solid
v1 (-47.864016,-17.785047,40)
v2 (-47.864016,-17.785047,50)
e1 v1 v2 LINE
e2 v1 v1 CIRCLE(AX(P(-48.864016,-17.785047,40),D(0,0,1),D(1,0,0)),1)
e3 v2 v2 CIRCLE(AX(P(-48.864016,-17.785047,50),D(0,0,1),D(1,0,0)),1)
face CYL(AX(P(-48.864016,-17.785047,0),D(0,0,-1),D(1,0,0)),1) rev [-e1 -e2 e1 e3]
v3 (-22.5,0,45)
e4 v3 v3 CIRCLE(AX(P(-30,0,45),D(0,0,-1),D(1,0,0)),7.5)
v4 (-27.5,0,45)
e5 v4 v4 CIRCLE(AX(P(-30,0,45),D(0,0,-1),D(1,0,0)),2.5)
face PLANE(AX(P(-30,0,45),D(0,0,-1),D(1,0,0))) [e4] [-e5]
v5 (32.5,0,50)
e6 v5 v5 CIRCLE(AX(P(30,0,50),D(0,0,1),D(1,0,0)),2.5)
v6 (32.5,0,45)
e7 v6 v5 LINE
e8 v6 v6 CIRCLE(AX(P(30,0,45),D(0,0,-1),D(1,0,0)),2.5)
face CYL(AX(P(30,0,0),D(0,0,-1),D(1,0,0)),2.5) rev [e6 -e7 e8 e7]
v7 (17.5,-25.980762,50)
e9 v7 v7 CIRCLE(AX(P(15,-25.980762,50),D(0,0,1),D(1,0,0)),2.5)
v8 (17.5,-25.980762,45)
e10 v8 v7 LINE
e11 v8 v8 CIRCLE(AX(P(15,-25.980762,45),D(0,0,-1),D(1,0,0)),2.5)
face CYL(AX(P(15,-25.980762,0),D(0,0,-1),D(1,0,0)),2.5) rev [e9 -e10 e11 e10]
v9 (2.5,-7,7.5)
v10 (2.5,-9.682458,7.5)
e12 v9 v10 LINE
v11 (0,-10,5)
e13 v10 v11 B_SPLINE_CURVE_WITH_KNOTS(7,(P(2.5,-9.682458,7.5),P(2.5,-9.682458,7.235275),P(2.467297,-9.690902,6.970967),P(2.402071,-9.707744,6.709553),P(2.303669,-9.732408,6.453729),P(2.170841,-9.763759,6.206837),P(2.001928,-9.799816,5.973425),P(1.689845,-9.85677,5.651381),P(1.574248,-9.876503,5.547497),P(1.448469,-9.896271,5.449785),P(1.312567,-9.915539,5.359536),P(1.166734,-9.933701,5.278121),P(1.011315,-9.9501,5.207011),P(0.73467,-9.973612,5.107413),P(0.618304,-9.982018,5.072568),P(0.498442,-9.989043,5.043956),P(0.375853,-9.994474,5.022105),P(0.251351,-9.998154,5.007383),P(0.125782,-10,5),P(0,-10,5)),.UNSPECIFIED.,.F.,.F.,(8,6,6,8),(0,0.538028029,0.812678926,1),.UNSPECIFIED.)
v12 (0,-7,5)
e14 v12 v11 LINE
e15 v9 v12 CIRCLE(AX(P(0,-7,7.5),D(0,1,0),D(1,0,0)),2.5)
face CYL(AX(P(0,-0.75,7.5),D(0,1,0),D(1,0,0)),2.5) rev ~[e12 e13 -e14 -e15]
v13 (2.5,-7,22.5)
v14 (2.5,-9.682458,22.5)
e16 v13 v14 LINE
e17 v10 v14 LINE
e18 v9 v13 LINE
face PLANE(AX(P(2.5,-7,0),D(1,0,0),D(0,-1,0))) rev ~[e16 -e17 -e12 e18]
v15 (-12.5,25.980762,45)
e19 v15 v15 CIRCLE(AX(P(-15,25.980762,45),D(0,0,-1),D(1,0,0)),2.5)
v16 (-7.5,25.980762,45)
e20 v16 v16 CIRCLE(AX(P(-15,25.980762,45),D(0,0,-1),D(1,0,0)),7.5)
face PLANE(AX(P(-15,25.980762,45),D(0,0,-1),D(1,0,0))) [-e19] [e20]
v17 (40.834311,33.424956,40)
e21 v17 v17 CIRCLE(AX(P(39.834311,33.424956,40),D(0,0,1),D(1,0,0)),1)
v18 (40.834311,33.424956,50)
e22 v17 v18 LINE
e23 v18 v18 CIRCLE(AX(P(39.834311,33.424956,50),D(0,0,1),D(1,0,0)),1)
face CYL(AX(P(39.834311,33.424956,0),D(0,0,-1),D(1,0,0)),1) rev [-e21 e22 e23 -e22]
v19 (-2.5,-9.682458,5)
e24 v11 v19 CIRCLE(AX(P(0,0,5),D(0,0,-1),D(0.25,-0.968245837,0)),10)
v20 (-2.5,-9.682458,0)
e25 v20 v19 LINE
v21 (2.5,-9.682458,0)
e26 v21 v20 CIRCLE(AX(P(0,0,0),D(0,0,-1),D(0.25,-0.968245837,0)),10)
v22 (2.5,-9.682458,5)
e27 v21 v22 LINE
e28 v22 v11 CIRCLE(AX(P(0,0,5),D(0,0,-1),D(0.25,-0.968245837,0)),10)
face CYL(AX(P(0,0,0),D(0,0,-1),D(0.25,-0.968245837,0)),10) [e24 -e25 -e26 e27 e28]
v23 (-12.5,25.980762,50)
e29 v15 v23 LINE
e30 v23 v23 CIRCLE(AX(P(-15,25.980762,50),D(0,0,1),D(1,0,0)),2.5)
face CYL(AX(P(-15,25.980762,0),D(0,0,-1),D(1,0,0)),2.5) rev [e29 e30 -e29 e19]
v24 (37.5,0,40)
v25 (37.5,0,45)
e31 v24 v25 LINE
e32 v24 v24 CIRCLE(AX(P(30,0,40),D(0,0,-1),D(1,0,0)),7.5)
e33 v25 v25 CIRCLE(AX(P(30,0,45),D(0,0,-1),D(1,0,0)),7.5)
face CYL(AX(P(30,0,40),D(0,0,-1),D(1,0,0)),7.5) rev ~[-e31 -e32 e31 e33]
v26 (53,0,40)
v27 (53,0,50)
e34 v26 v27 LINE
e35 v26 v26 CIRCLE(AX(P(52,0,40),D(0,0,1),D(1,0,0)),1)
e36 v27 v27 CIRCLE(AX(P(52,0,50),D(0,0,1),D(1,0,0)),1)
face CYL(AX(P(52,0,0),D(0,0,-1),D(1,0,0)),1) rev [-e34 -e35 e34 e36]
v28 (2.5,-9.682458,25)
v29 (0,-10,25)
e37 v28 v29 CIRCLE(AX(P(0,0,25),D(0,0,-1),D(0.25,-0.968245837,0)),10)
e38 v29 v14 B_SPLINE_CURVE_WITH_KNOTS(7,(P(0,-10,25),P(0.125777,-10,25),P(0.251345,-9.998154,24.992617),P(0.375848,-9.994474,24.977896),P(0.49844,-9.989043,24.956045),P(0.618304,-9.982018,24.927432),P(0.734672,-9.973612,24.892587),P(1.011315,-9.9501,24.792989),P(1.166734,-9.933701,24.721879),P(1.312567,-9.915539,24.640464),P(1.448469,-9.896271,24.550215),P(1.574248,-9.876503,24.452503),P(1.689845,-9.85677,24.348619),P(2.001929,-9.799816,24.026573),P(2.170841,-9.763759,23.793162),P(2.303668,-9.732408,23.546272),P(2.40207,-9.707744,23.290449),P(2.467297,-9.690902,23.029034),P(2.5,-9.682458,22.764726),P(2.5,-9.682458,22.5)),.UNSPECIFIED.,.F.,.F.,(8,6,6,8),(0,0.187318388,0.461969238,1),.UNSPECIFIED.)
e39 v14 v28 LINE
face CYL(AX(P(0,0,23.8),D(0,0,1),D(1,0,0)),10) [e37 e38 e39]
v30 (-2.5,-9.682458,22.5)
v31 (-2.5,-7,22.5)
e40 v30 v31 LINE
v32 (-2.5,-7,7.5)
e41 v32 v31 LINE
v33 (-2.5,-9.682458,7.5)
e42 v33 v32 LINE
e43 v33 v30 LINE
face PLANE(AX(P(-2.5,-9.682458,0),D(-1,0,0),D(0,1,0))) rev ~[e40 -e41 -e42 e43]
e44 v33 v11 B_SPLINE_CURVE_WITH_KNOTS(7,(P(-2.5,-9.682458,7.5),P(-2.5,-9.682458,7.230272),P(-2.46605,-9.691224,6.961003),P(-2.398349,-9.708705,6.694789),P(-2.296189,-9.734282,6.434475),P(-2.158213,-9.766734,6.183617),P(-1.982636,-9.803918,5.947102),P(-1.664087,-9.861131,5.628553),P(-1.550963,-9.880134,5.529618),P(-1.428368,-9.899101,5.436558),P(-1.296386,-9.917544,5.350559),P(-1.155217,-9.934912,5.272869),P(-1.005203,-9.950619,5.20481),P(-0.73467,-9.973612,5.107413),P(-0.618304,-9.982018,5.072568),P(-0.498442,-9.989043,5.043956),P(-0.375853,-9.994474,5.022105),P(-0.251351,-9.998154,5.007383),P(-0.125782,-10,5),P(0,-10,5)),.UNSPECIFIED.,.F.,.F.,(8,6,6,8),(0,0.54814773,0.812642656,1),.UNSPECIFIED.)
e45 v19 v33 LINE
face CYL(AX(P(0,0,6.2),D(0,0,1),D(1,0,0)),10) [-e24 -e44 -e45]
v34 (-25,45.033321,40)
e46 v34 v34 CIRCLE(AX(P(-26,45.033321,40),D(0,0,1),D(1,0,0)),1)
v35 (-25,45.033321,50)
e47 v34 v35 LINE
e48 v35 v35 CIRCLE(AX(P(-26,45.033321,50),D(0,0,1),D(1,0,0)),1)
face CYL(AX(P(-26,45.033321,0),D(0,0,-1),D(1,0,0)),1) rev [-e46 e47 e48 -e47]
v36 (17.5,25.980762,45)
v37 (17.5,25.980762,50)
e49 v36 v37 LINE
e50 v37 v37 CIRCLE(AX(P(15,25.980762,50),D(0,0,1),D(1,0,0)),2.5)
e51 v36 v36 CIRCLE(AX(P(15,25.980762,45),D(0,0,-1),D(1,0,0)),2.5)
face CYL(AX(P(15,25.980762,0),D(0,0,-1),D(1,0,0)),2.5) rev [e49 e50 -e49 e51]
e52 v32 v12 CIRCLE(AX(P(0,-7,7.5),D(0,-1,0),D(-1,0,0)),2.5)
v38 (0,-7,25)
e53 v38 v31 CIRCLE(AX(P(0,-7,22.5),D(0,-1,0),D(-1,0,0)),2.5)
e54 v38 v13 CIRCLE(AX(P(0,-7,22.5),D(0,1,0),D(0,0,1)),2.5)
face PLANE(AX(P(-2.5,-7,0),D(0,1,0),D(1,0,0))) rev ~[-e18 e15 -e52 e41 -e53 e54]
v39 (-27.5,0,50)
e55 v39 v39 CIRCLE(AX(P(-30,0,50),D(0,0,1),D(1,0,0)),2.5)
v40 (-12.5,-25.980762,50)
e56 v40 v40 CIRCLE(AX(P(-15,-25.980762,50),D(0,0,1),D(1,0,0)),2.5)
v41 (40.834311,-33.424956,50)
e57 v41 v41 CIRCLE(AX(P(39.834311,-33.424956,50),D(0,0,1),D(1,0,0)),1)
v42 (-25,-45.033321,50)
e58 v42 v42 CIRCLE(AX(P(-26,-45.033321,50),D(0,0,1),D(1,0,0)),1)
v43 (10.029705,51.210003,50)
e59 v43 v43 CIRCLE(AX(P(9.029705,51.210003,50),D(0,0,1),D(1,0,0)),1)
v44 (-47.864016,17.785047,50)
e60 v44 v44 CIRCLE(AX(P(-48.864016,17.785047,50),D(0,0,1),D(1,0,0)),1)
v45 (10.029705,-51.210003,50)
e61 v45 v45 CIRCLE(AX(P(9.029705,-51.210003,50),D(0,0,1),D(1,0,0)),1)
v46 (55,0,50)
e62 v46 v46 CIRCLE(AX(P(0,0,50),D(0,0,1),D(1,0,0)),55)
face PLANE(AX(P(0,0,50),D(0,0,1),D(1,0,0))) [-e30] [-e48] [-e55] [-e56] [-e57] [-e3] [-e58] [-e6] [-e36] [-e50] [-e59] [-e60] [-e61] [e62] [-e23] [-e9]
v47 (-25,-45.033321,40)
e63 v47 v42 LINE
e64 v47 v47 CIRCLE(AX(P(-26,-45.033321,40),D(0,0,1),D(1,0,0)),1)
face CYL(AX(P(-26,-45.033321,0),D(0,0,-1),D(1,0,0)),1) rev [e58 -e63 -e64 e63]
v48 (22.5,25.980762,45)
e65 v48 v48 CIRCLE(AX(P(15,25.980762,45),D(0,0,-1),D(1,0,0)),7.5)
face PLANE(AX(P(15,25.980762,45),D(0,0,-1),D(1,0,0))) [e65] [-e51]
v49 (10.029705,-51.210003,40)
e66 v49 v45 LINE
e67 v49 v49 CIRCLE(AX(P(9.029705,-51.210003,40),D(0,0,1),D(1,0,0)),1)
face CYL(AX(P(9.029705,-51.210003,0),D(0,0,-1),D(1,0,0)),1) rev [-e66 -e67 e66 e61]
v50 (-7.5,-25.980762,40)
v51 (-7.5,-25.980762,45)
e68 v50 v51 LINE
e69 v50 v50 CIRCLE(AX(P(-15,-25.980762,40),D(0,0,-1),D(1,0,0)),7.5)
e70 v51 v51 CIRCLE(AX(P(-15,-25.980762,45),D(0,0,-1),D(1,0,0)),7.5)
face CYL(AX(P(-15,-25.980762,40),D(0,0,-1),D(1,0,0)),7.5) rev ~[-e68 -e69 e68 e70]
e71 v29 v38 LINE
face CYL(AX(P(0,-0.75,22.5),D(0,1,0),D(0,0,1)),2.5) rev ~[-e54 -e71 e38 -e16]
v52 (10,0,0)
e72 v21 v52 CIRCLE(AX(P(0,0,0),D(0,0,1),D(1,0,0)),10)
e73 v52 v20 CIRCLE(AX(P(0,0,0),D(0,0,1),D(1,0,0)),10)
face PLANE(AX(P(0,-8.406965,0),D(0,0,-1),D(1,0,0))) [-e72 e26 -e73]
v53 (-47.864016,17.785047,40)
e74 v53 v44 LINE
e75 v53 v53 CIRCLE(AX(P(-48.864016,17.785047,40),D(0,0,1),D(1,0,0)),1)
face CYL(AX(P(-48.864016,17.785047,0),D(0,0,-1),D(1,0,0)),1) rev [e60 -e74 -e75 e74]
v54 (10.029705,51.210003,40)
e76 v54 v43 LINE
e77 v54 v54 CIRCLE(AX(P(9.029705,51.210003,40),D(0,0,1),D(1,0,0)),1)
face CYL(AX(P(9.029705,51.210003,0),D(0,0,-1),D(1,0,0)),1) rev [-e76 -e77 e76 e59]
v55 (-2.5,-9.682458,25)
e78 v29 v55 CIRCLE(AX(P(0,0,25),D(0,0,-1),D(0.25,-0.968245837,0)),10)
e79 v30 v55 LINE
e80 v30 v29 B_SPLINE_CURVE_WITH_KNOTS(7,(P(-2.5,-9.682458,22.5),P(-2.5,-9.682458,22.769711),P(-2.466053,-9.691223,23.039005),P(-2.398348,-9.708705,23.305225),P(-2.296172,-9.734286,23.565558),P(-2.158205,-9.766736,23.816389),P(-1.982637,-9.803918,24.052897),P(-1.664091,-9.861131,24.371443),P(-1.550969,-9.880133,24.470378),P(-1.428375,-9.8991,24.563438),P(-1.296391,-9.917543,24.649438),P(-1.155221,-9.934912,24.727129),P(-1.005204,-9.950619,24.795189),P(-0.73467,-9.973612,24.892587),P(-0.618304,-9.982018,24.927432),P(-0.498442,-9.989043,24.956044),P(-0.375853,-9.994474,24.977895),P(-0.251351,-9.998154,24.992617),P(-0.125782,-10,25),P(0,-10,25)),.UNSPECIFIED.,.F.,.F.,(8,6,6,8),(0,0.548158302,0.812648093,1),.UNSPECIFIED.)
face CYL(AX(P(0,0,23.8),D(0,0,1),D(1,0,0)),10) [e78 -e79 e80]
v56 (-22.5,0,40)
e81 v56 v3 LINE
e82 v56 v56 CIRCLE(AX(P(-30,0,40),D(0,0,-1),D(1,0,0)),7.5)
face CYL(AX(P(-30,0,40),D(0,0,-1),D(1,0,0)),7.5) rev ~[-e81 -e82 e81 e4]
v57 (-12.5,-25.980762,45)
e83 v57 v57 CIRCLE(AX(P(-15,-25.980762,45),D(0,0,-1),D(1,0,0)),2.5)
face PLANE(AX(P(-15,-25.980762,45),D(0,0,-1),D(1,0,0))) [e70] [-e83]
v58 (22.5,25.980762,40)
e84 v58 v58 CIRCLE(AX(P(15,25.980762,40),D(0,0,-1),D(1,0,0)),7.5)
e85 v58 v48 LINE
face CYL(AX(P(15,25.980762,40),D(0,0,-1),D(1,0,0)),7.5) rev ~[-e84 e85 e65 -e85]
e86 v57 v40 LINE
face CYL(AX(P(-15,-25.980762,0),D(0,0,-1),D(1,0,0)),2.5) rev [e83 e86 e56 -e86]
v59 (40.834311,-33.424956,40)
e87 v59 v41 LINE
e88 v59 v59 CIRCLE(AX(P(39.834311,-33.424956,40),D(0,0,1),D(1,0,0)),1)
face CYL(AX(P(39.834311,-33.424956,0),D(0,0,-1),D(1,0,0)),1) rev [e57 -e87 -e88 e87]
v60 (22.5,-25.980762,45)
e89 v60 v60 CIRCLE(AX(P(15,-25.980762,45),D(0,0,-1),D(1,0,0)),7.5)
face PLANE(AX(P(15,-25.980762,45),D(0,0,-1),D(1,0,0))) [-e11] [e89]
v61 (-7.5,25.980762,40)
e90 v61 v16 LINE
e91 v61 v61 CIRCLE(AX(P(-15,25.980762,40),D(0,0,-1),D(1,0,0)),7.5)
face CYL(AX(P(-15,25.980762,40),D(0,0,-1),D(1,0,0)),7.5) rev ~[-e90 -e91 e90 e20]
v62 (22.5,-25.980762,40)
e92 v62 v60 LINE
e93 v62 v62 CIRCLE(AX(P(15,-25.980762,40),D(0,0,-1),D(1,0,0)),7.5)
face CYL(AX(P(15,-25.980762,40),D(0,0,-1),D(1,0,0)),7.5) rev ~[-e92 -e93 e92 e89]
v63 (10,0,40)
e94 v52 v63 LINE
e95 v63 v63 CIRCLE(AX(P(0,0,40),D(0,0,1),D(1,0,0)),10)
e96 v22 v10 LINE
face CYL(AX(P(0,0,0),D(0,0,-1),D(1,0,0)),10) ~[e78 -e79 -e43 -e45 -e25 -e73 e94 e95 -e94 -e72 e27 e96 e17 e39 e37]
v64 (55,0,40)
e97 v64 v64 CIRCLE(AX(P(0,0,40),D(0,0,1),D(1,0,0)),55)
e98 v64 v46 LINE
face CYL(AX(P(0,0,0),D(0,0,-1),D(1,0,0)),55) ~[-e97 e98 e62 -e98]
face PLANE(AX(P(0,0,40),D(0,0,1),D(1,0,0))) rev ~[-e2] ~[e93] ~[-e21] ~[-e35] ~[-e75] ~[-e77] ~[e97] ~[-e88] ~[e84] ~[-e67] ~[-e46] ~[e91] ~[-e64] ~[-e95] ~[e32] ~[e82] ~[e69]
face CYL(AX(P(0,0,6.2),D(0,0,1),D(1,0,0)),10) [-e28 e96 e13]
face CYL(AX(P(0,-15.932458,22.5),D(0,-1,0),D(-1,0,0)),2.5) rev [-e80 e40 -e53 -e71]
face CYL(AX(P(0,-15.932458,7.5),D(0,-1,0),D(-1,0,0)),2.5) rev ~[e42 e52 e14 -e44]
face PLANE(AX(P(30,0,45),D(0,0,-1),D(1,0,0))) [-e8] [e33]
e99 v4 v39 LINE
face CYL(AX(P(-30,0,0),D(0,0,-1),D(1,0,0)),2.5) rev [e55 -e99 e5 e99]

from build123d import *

# Parameters (mm, degrees)
F0_R         = 55
F0_R_2       = 1
F0_R_3       = 2.5
F0_R_4       = 10
F1_DEPTH     = 50
F1_FACE_R    = 55
F1_FACE_R_2  = 1
F1_FACE_R_3  = 2.5
F2_DEPTH     = 40
F3_R         = 7.5
F3_R_2       = 2.5
F4_DEPTH     = 5
F6_DEPTH     = 25
F7_DEPTH     = 5
F8_T4_DEPTH  = 15.1824583655
F8_S5_R      = 10
F8_T6_DEPTH  = 9
F8_T10_DEPTH = 15.1824583655
F8_S11_R     = 10
F8_T12_DEPTH = 9
F8_T16_DEPTH = 15.1824583655
F8_S17_R     = 10
F8_T18_DEPTH = 9
F8_T22_DEPTH = 15.1824583655
F8_S23_R     = 10
F8_T24_DEPTH = 9


# Not quite as in the source:
# - a fillet or chamfer that OpenCascade refuses, or shapes differently, is made with other operations: its cross-section is extruded or revolved along the edge and cut away or added


with BuildPart() as f1:
    # F0 (on Top) → F1 (new body)
    with BuildSketch(Plane.XY):
        Circle(F0_R)
        with Locations((-26, -45.0333209968)):
            Circle(F0_R_2, mode=Mode.SUBTRACT)
        with Locations((-48.8640162809, -17.7850474529)):
            Circle(F0_R_2, mode=Mode.SUBTRACT)
        with Locations((-15, -25.9807621135)):
            Circle(F0_R_3, mode=Mode.SUBTRACT)
        with Locations((9.0297052387, -51.2100031566)):
            Circle(F0_R_2, mode=Mode.SUBTRACT)
        with Locations((39.8343110422, -33.4249557037)):
            Circle(F0_R_2, mode=Mode.SUBTRACT)
        with Locations((15, -25.9807621135)):
            Circle(F0_R_3, mode=Mode.SUBTRACT)
        with Locations((-30, 0)):
            Circle(F0_R_3, mode=Mode.SUBTRACT)
        with Locations((-48.8640162809, 17.7850474529)):
            Circle(F0_R_2, mode=Mode.SUBTRACT)
        with Locations((-15, 25.9807621135)):
            Circle(F0_R_3, mode=Mode.SUBTRACT)
        with Locations((-26, 45.0333209968)):
            Circle(F0_R_2, mode=Mode.SUBTRACT)
        Circle(F0_R_4, mode=Mode.SUBTRACT)
        with Locations((15, 25.9807621135)):
            Circle(F0_R_3, mode=Mode.SUBTRACT)
        with Locations((30, 0)):
            Circle(F0_R_3, mode=Mode.SUBTRACT)
        with Locations((52, 0)):
            Circle(F0_R_2, mode=Mode.SUBTRACT)
        with Locations((9.0297052387, 51.2100031566)):
            Circle(F0_R_2, mode=Mode.SUBTRACT)
        with Locations((39.8343110422, 33.4249557037)):
            Circle(F0_R_2, mode=Mode.SUBTRACT)
        Circle(F0_R_4)
    extrude(amount=F1_DEPTH)

    # F0 (on Top) + F1_face (on face) → F2 (cut)
    with BuildSketch(Plane.XY):
        Circle(F0_R)
        with Locations((-26, -45.0333209968)):
            Circle(F0_R_2, mode=Mode.SUBTRACT)
        with Locations((-48.8640162809, -17.7850474529)):
            Circle(F0_R_2, mode=Mode.SUBTRACT)
        with Locations((-15, -25.9807621135)):
            Circle(F0_R_3, mode=Mode.SUBTRACT)
        with Locations((9.0297052387, -51.2100031566)):
            Circle(F0_R_2, mode=Mode.SUBTRACT)
        with Locations((39.8343110422, -33.4249557037)):
            Circle(F0_R_2, mode=Mode.SUBTRACT)
        with Locations((15, -25.9807621135)):
            Circle(F0_R_3, mode=Mode.SUBTRACT)
        with Locations((-30, 0)):
            Circle(F0_R_3, mode=Mode.SUBTRACT)
        with Locations((-48.8640162809, 17.7850474529)):
            Circle(F0_R_2, mode=Mode.SUBTRACT)
        with Locations((-15, 25.9807621135)):
            Circle(F0_R_3, mode=Mode.SUBTRACT)
        with Locations((-26, 45.0333209968)):
            Circle(F0_R_2, mode=Mode.SUBTRACT)
        Circle(F0_R_4, mode=Mode.SUBTRACT)
        with Locations((15, 25.9807621135)):
            Circle(F0_R_3, mode=Mode.SUBTRACT)
        with Locations((30, 0)):
            Circle(F0_R_3, mode=Mode.SUBTRACT)
        with Locations((52, 0)):
            Circle(F0_R_2, mode=Mode.SUBTRACT)
        with Locations((9.0297052387, 51.2100031566)):
            Circle(F0_R_2, mode=Mode.SUBTRACT)
        with Locations((39.8343110422, 33.4249557037)):
            Circle(F0_R_2, mode=Mode.SUBTRACT)
    with BuildSketch(Plane.XY.offset(50)):
        Circle(F1_FACE_R)
        with Locations((-26, -45.0333209968)):
            Circle(F1_FACE_R_2, mode=Mode.SUBTRACT)
        with Locations((-48.8640162809, -17.7850474529)):
            Circle(F1_FACE_R_2, mode=Mode.SUBTRACT)
        with Locations((-15, -25.9807621135)):
            Circle(F1_FACE_R_3, mode=Mode.SUBTRACT)
        with Locations((9.0297052387, -51.2100031566)):
            Circle(F1_FACE_R_2, mode=Mode.SUBTRACT)
        with Locations((39.8343110422, -33.4249557037)):
            Circle(F1_FACE_R_2, mode=Mode.SUBTRACT)
        with Locations((15, -25.9807621135)):
            Circle(F1_FACE_R_3, mode=Mode.SUBTRACT)
        with Locations((-30, 0)):
            Circle(F1_FACE_R_3, mode=Mode.SUBTRACT)
        with Locations((-48.8640162809, 17.7850474529)):
            Circle(F1_FACE_R_2, mode=Mode.SUBTRACT)
        with Locations((-15, 25.9807621135)):
            Circle(F1_FACE_R_3, mode=Mode.SUBTRACT)
        with Locations((-26, 45.0333209968)):
            Circle(F1_FACE_R_2, mode=Mode.SUBTRACT)
        with Locations((15, 25.9807621135)):
            Circle(F1_FACE_R_3, mode=Mode.SUBTRACT)
        with Locations((30, 0)):
            Circle(F1_FACE_R_3, mode=Mode.SUBTRACT)
        with Locations((52, 0)):
            Circle(F1_FACE_R_2, mode=Mode.SUBTRACT)
        with Locations((9.0297052387, 51.2100031566)):
            Circle(F1_FACE_R_2, mode=Mode.SUBTRACT)
        with Locations((39.8343110422, 33.4249557037)):
            Circle(F1_FACE_R_2, mode=Mode.SUBTRACT)
    extrude(amount=F2_DEPTH, mode=Mode.SUBTRACT)

    # F3 (on face) → F4 (cut)
    with BuildSketch(Plane(origin=(0, 0, 40), x_dir=(1, 0, 0), z_dir=(0, 0, -1))):
        with Locations((15, -25.9807621135)):
            Circle(F3_R)
        with Locations((15, -25.9807621135)):
            Circle(F3_R_2, mode=Mode.SUBTRACT)
        with Locations((30, 0)):
            Circle(F3_R)
        with Locations((30, 0)):
            Circle(F3_R_2, mode=Mode.SUBTRACT)
        with Locations((-15, -25.9807621135)):
            Circle(F3_R)
        with Locations((-15, -25.9807621135)):
            Circle(F3_R_2, mode=Mode.SUBTRACT)
        with Locations((15, 25.9807621135)):
            Circle(F3_R)
        with Locations((15, 25.9807621135)):
            Circle(F3_R_2, mode=Mode.SUBTRACT)
        with Locations((-15, 25.9807621135)):
            Circle(F3_R)
        with Locations((-15, 25.9807621135)):
            Circle(F3_R_2, mode=Mode.SUBTRACT)
        with Locations((-30, 0)):
            Circle(F3_R)
        with Locations((-30, 0)):
            Circle(F3_R_2, mode=Mode.SUBTRACT)
    extrude(amount=-F4_DEPTH, mode=Mode.SUBTRACT)

    # F5 (on face) → F6 (cut)
    with BuildSketch(Plane(origin=(0, 0, 0), x_dir=(1, 0, 0), z_dir=(0, 0, -1))):
        with BuildLine():
            Line((-2.5, 7), (0, 7))
            Line((0, 7), (2.5, 7))
            Line((2.5, 7), (2.5, 9.6824583655))
            ThreePointArc((2.5, 9.6824583655), (0, 10), (-2.5, 9.6824583655))
            Line((-2.5, 9.6824583655), (-2.5, 7))
        make_face()
    extrude(amount=-F6_DEPTH, mode=Mode.SUBTRACT)

    # F5 (on face) → F7 (join)
    with BuildSketch(Plane(origin=(0, 0, 0), x_dir=(1, 0, 0), z_dir=(0, 0, -1))):
        with BuildLine():
            Line((-2.5, 7), (0, 7))
            Line((0, 7), (2.5, 7))
            Line((2.5, 7), (2.5, 9.6824583655))
            ThreePointArc((2.5, 9.6824583655), (0, 10), (-2.5, 9.6824583655))
            Line((-2.5, 9.6824583655), (-2.5, 7))
        make_face()
    extrude(amount=-F7_DEPTH)

    # F8: fillet of radius 2.5 on 4 edges, made by hand


with BuildPart() as f8_tool2:
    # F8_s3 → F8_t4 (new body)
    with BuildSketch(Plane.XZ.offset(15.9324583655)):
        with BuildLine():
            ThreePointArc((-2.5, 22.5), (-1.767766953, 24.267766953), (0, 25))
            Line((0, 25), (-2.5, 25))
            Line((-2.5, 25), (-2.5, 22.5))
        make_face()
    extrude(amount=-F8_T4_DEPTH)

    # F8_s5 → F8_t6 (intersect, symmetric)
    with BuildSketch(Plane.XY.offset(23.8)):
        Circle(F8_S5_R)
    extrude(amount=F8_T6_DEPTH, both=True, mode=Mode.INTERSECT)


with BuildPart() as f1_1:
    add(f1.part)

    # F8_t1: union F8_tool2
    add(f8_tool2.part)


with BuildPart() as f8_tool8:
    # F8_s9 → F8_t10 (new body)
    with BuildSketch(Plane.XZ.offset(0.75)):
        with BuildLine():
            ThreePointArc((0, 25), (1.767766953, 24.267766953), (2.5, 22.5))
            Line((2.5, 22.5), (2.5, 25))
            Line((2.5, 25), (0, 25))
        make_face()
    extrude(amount=F8_T10_DEPTH)

    # F8_s11 → F8_t12 (intersect, symmetric)
    with BuildSketch(Plane.XY.offset(23.8)):
        Circle(F8_S11_R)
    extrude(amount=F8_T12_DEPTH, both=True, mode=Mode.INTERSECT)


with BuildPart() as f1_2:
    add(f1_1.part)

    # F8_t7: union F8_tool8
    add(f8_tool8.part)


with BuildPart() as f8_tool14:
    # F8_s15 → F8_t16 (new body)
    with BuildSketch(Plane.XZ.offset(0.75)):
        with BuildLine():
            ThreePointArc((2.5, 7.5), (1.767766953, 5.732233047), (0, 5))
            Line((0, 5), (2.5, 5))
            Line((2.5, 5), (2.5, 7.5))
        make_face()
    extrude(amount=F8_T16_DEPTH)

    # F8_s17 → F8_t18 (intersect, symmetric)
    with BuildSketch(Plane.XY.offset(6.2)):
        Circle(F8_S17_R)
    extrude(amount=F8_T18_DEPTH, both=True, mode=Mode.INTERSECT)


with BuildPart() as f1_3:
    add(f1_2.part)

    # F8_t13: union F8_tool14
    add(f8_tool14.part)


with BuildPart() as f8_tool20:
    # F8_s21 → F8_t22 (new body)
    with BuildSketch(Plane.XZ.offset(15.9324583655)):
        with BuildLine():
            ThreePointArc((-2.5, 7.5), (-1.767766953, 5.732233047), (0, 5))
            Line((0, 5), (-2.5, 5))
            Line((-2.5, 5), (-2.5, 7.5))
        make_face()
    extrude(amount=-F8_T22_DEPTH)

    # F8_s23 → F8_t24 (intersect, symmetric)
    with BuildSketch(Plane.XY.offset(6.2)):
        Circle(F8_S23_R)
    extrude(amount=F8_T24_DEPTH, both=True, mode=Mode.INTERSECT)


with BuildPart() as f1_4:
    add(f1_3.part)

    # F8_t19: union F8_tool20
    add(f8_tool20.part)


solid = f1_4.part
